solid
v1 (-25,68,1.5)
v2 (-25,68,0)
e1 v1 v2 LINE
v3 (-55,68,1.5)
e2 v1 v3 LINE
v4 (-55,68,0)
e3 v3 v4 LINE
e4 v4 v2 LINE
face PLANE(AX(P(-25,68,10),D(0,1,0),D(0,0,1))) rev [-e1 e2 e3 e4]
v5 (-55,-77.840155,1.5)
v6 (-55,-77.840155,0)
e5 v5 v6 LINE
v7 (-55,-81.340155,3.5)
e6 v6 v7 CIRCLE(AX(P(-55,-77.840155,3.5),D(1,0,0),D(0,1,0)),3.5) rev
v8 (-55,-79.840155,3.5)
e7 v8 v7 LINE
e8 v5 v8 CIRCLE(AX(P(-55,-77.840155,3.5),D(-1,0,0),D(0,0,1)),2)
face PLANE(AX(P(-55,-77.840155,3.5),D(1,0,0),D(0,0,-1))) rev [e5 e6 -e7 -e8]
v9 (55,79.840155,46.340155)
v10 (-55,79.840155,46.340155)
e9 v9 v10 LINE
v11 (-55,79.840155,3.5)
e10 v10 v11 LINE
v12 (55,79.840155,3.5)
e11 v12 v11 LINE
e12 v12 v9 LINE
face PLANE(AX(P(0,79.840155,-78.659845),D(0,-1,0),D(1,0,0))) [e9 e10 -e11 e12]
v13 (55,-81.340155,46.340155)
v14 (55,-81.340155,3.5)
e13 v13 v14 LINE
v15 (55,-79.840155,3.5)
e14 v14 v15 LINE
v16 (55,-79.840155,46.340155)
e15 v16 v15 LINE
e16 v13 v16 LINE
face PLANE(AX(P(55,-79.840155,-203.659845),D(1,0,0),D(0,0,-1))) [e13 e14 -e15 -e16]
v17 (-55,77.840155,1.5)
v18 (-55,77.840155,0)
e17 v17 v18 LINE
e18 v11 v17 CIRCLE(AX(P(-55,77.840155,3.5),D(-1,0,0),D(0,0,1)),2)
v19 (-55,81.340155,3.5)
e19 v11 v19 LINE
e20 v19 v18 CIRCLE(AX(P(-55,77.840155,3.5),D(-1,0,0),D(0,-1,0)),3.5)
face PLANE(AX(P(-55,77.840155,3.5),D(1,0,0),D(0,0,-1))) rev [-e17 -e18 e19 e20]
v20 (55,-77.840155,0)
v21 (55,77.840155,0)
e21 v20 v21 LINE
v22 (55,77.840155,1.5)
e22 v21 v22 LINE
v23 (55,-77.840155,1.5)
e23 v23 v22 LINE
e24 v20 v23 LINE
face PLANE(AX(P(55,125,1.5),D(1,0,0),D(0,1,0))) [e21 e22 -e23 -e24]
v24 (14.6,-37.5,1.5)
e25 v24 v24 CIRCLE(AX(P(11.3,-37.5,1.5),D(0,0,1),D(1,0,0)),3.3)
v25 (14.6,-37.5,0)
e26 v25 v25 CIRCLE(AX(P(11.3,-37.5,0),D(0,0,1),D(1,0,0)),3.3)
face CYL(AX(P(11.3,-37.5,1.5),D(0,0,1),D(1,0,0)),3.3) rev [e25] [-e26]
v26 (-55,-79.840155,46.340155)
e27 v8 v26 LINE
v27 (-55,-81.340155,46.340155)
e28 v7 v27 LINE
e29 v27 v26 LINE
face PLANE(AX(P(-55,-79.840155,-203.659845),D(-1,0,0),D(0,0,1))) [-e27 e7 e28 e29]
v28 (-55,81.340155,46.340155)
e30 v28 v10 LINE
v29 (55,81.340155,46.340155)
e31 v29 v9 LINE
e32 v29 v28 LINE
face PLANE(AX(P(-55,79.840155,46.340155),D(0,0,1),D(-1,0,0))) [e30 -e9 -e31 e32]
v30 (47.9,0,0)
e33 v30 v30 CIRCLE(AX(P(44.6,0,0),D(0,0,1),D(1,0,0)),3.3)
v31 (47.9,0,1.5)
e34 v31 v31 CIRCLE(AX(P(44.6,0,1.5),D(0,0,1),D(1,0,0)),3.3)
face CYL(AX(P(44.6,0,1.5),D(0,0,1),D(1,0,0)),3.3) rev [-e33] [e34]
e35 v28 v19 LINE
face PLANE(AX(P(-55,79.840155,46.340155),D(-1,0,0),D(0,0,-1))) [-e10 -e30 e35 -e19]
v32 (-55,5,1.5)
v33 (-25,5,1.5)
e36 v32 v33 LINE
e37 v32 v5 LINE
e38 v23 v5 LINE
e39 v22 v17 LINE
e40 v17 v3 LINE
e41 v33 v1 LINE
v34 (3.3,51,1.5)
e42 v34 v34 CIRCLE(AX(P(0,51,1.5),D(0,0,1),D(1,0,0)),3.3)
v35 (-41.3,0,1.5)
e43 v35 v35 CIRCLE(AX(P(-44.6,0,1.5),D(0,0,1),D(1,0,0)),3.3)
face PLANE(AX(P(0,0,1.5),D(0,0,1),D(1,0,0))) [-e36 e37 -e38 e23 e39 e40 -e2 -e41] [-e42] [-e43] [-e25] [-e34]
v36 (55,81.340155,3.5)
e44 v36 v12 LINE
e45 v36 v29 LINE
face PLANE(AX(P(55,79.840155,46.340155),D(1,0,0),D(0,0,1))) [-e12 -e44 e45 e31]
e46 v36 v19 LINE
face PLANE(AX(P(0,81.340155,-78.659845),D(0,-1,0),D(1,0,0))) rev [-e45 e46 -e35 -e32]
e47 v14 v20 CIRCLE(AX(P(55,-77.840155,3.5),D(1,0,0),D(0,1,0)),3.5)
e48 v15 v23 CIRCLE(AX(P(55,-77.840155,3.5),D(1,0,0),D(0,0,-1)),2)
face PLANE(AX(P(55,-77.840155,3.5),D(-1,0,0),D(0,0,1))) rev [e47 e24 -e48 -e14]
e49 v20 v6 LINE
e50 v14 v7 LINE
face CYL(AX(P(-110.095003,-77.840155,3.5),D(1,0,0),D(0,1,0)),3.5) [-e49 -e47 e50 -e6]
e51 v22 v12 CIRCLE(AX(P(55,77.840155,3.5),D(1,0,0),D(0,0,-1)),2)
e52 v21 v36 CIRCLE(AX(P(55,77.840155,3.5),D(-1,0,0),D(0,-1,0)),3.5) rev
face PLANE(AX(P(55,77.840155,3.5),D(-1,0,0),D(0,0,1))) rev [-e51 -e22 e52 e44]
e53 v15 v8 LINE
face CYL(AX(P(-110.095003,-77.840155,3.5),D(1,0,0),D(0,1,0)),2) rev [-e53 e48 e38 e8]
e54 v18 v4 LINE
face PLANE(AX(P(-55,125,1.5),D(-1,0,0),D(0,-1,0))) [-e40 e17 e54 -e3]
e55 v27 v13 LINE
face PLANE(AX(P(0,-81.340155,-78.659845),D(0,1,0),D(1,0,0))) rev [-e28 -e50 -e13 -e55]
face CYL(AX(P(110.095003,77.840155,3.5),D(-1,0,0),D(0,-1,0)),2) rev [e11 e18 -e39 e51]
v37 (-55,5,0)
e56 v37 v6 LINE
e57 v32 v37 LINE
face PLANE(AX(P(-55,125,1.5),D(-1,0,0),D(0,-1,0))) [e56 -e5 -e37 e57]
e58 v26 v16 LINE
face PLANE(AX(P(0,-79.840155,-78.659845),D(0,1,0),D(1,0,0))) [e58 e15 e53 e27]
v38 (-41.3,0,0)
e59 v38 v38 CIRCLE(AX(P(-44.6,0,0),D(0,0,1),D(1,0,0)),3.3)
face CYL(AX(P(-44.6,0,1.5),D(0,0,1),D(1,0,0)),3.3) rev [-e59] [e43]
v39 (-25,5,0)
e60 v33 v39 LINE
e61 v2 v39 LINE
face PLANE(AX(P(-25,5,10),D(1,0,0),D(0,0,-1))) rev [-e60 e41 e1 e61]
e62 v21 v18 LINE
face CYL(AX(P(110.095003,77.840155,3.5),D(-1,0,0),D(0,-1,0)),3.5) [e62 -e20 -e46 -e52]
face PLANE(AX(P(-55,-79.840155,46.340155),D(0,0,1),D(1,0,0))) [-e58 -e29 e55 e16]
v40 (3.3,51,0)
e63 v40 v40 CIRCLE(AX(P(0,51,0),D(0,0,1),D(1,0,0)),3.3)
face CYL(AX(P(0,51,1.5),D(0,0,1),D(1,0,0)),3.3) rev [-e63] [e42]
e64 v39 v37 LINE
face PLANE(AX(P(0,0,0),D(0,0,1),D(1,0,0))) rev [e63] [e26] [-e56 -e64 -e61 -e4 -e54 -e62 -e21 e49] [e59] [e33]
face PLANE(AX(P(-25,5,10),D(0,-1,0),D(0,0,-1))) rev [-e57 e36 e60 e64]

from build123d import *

# Parameters (mm, degrees)
ESBO_O1_W                   = 110
ESBO_O1_H                   = 250
RESSALTO_EXTRUS_O1_DEPTH    = 1.5
FURO_COM_FOLGA_DE_M62_D     = 6.6
FURO_COM_FOLGA_DE_M62_DEPTH = 10
FURO_COM_FOLGA_DE_M62_TIP   = 1.982840043
DOBRA_START                 = -55
DOBRA_ESBO_ADA1_DEPTH       = 110
DOBRA_ESBO_ADA1_2_DEPTH     = 110
DOBRA_ESBO_ADA2_DEPTH       = 110
DOBRA_ESBO_ADA2_2_DEPTH     = 110
ESBO_O12_W                  = 30
ESBO_O12_H                  = 63
CORTE_EXTRUS_O1_DEPTH       = 10


# Read off the part's stored shape, not the designer's step: Dobra esboçada1, Dobra esboçada2
with BuildPart() as part:
    # Esboço1 → Ressalto-extrusão1 (new body)
    with BuildSketch(Plane.XY):
        Rectangle(ESBO_O1_W, ESBO_O1_H)
    extrude(amount=RESSALTO_EXTRUS_O1_DEPTH)

    # Furo com folga de M62
    with Locations(Plane.XY.offset(1.5)):
        with Locations((0, 51), (-44.6, 0), (44.6, 0), (11.3, -37.5)):
            Hole(FURO_COM_FOLGA_DE_M62_D / 2, depth=FURO_COM_FOLGA_DE_M62_DEPTH)
            with Locations((0, 0, -(FURO_COM_FOLGA_DE_M62_DEPTH + FURO_COM_FOLGA_DE_M62_TIP / 2))):  # 118° drill point
                Cone(0, FURO_COM_FOLGA_DE_M62_D / 2, FURO_COM_FOLGA_DE_M62_TIP, mode=Mode.SUBTRACT)

    # Dobra esboçada1 outline → Dobra esboçada1 (cut)
    with BuildSketch(Plane.YZ.offset(DOBRA_START)):
        with BuildLine():
            ThreePointArc((-77.840155051, 0), (-79.460340225, 0.397581589), (-80.712436374, 1.5))
            Line((-80.712436374, 1.5), (-125, 1.5))
            Line((-125, 1.5), (-125, 0))
            Line((-125, 0), (-77.840155051, 0))
        make_face()
    extrude(amount=DOBRA_ESBO_ADA1_DEPTH, mode=Mode.SUBTRACT)

    # Dobra esbo_ada1 2 outline → Dobra esbo_ada1 2 (add)
    with BuildSketch(Plane.YZ.offset(DOBRA_START)):
        with BuildLine():
            ThreePointArc((-77.840155051, 1.5), (-79.254368613, 2.085786438), (-79.840155051, 3.5))
            Line((-79.840155051, 3.5), (-79.840155051, 46.340155051))
            Line((-79.840155051, 46.340155051), (-81.340155051, 46.340155051))
            Line((-81.340155051, 46.340155051), (-81.340155051, 3.5))
            ThreePointArc((-81.340155051, 3.5), (-81.179540071, 2.451902827), (-80.712436374, 1.5))
            Line((-80.712436374, 1.5), (-77.840155051, 1.5))
        make_face()
    extrude(amount=DOBRA_ESBO_ADA1_2_DEPTH)

    # Dobra esboçada2 outline → Dobra esboçada2 (cut)
    with BuildSketch(Plane.YZ.offset(DOBRA_START)):
        with BuildLine():
            Line((125, 1.5), (80.712436374, 1.5))
            ThreePointArc((80.712436374, 1.5), (79.460340225, 0.397581589), (77.840155051, 0))
            Line((77.840155051, 0), (125, 0))
            Line((125, 0), (125, 1.5))
        make_face()
    extrude(amount=DOBRA_ESBO_ADA2_DEPTH, mode=Mode.SUBTRACT)

    # Dobra esbo_ada2 2 outline → Dobra esbo_ada2 2 (add)
    with BuildSketch(Plane.YZ.offset(DOBRA_START)):
        with BuildLine():
            Line((81.340155051, 3.5), (81.340155051, 46.340155051))
            Line((81.340155051, 46.340155051), (79.840155051, 46.340155051))
            Line((79.840155051, 46.340155051), (79.840155051, 3.5))
            ThreePointArc((79.840155051, 3.5), (79.254368613, 2.085786438), (77.840155051, 1.5))
            Line((77.840155051, 1.5), (80.712436374, 1.5))
            ThreePointArc((80.712436374, 1.5), (81.179540071, 2.451902827), (81.340155051, 3.5))
        make_face()
    extrude(amount=DOBRA_ESBO_ADA2_2_DEPTH)

    # Esboço12 → Corte-extrusão1 (cut)
    with BuildSketch(Plane(origin=(0, 0, 0), x_dir=(-1, 0, 0), z_dir=(0, 0, -1))):
        with Locations((40, 36.5)):
            Rectangle(ESBO_O12_W, ESBO_O12_H)
    extrude(amount=-CORTE_EXTRUS_O1_DEPTH, mode=Mode.SUBTRACT)


solid = part.part
